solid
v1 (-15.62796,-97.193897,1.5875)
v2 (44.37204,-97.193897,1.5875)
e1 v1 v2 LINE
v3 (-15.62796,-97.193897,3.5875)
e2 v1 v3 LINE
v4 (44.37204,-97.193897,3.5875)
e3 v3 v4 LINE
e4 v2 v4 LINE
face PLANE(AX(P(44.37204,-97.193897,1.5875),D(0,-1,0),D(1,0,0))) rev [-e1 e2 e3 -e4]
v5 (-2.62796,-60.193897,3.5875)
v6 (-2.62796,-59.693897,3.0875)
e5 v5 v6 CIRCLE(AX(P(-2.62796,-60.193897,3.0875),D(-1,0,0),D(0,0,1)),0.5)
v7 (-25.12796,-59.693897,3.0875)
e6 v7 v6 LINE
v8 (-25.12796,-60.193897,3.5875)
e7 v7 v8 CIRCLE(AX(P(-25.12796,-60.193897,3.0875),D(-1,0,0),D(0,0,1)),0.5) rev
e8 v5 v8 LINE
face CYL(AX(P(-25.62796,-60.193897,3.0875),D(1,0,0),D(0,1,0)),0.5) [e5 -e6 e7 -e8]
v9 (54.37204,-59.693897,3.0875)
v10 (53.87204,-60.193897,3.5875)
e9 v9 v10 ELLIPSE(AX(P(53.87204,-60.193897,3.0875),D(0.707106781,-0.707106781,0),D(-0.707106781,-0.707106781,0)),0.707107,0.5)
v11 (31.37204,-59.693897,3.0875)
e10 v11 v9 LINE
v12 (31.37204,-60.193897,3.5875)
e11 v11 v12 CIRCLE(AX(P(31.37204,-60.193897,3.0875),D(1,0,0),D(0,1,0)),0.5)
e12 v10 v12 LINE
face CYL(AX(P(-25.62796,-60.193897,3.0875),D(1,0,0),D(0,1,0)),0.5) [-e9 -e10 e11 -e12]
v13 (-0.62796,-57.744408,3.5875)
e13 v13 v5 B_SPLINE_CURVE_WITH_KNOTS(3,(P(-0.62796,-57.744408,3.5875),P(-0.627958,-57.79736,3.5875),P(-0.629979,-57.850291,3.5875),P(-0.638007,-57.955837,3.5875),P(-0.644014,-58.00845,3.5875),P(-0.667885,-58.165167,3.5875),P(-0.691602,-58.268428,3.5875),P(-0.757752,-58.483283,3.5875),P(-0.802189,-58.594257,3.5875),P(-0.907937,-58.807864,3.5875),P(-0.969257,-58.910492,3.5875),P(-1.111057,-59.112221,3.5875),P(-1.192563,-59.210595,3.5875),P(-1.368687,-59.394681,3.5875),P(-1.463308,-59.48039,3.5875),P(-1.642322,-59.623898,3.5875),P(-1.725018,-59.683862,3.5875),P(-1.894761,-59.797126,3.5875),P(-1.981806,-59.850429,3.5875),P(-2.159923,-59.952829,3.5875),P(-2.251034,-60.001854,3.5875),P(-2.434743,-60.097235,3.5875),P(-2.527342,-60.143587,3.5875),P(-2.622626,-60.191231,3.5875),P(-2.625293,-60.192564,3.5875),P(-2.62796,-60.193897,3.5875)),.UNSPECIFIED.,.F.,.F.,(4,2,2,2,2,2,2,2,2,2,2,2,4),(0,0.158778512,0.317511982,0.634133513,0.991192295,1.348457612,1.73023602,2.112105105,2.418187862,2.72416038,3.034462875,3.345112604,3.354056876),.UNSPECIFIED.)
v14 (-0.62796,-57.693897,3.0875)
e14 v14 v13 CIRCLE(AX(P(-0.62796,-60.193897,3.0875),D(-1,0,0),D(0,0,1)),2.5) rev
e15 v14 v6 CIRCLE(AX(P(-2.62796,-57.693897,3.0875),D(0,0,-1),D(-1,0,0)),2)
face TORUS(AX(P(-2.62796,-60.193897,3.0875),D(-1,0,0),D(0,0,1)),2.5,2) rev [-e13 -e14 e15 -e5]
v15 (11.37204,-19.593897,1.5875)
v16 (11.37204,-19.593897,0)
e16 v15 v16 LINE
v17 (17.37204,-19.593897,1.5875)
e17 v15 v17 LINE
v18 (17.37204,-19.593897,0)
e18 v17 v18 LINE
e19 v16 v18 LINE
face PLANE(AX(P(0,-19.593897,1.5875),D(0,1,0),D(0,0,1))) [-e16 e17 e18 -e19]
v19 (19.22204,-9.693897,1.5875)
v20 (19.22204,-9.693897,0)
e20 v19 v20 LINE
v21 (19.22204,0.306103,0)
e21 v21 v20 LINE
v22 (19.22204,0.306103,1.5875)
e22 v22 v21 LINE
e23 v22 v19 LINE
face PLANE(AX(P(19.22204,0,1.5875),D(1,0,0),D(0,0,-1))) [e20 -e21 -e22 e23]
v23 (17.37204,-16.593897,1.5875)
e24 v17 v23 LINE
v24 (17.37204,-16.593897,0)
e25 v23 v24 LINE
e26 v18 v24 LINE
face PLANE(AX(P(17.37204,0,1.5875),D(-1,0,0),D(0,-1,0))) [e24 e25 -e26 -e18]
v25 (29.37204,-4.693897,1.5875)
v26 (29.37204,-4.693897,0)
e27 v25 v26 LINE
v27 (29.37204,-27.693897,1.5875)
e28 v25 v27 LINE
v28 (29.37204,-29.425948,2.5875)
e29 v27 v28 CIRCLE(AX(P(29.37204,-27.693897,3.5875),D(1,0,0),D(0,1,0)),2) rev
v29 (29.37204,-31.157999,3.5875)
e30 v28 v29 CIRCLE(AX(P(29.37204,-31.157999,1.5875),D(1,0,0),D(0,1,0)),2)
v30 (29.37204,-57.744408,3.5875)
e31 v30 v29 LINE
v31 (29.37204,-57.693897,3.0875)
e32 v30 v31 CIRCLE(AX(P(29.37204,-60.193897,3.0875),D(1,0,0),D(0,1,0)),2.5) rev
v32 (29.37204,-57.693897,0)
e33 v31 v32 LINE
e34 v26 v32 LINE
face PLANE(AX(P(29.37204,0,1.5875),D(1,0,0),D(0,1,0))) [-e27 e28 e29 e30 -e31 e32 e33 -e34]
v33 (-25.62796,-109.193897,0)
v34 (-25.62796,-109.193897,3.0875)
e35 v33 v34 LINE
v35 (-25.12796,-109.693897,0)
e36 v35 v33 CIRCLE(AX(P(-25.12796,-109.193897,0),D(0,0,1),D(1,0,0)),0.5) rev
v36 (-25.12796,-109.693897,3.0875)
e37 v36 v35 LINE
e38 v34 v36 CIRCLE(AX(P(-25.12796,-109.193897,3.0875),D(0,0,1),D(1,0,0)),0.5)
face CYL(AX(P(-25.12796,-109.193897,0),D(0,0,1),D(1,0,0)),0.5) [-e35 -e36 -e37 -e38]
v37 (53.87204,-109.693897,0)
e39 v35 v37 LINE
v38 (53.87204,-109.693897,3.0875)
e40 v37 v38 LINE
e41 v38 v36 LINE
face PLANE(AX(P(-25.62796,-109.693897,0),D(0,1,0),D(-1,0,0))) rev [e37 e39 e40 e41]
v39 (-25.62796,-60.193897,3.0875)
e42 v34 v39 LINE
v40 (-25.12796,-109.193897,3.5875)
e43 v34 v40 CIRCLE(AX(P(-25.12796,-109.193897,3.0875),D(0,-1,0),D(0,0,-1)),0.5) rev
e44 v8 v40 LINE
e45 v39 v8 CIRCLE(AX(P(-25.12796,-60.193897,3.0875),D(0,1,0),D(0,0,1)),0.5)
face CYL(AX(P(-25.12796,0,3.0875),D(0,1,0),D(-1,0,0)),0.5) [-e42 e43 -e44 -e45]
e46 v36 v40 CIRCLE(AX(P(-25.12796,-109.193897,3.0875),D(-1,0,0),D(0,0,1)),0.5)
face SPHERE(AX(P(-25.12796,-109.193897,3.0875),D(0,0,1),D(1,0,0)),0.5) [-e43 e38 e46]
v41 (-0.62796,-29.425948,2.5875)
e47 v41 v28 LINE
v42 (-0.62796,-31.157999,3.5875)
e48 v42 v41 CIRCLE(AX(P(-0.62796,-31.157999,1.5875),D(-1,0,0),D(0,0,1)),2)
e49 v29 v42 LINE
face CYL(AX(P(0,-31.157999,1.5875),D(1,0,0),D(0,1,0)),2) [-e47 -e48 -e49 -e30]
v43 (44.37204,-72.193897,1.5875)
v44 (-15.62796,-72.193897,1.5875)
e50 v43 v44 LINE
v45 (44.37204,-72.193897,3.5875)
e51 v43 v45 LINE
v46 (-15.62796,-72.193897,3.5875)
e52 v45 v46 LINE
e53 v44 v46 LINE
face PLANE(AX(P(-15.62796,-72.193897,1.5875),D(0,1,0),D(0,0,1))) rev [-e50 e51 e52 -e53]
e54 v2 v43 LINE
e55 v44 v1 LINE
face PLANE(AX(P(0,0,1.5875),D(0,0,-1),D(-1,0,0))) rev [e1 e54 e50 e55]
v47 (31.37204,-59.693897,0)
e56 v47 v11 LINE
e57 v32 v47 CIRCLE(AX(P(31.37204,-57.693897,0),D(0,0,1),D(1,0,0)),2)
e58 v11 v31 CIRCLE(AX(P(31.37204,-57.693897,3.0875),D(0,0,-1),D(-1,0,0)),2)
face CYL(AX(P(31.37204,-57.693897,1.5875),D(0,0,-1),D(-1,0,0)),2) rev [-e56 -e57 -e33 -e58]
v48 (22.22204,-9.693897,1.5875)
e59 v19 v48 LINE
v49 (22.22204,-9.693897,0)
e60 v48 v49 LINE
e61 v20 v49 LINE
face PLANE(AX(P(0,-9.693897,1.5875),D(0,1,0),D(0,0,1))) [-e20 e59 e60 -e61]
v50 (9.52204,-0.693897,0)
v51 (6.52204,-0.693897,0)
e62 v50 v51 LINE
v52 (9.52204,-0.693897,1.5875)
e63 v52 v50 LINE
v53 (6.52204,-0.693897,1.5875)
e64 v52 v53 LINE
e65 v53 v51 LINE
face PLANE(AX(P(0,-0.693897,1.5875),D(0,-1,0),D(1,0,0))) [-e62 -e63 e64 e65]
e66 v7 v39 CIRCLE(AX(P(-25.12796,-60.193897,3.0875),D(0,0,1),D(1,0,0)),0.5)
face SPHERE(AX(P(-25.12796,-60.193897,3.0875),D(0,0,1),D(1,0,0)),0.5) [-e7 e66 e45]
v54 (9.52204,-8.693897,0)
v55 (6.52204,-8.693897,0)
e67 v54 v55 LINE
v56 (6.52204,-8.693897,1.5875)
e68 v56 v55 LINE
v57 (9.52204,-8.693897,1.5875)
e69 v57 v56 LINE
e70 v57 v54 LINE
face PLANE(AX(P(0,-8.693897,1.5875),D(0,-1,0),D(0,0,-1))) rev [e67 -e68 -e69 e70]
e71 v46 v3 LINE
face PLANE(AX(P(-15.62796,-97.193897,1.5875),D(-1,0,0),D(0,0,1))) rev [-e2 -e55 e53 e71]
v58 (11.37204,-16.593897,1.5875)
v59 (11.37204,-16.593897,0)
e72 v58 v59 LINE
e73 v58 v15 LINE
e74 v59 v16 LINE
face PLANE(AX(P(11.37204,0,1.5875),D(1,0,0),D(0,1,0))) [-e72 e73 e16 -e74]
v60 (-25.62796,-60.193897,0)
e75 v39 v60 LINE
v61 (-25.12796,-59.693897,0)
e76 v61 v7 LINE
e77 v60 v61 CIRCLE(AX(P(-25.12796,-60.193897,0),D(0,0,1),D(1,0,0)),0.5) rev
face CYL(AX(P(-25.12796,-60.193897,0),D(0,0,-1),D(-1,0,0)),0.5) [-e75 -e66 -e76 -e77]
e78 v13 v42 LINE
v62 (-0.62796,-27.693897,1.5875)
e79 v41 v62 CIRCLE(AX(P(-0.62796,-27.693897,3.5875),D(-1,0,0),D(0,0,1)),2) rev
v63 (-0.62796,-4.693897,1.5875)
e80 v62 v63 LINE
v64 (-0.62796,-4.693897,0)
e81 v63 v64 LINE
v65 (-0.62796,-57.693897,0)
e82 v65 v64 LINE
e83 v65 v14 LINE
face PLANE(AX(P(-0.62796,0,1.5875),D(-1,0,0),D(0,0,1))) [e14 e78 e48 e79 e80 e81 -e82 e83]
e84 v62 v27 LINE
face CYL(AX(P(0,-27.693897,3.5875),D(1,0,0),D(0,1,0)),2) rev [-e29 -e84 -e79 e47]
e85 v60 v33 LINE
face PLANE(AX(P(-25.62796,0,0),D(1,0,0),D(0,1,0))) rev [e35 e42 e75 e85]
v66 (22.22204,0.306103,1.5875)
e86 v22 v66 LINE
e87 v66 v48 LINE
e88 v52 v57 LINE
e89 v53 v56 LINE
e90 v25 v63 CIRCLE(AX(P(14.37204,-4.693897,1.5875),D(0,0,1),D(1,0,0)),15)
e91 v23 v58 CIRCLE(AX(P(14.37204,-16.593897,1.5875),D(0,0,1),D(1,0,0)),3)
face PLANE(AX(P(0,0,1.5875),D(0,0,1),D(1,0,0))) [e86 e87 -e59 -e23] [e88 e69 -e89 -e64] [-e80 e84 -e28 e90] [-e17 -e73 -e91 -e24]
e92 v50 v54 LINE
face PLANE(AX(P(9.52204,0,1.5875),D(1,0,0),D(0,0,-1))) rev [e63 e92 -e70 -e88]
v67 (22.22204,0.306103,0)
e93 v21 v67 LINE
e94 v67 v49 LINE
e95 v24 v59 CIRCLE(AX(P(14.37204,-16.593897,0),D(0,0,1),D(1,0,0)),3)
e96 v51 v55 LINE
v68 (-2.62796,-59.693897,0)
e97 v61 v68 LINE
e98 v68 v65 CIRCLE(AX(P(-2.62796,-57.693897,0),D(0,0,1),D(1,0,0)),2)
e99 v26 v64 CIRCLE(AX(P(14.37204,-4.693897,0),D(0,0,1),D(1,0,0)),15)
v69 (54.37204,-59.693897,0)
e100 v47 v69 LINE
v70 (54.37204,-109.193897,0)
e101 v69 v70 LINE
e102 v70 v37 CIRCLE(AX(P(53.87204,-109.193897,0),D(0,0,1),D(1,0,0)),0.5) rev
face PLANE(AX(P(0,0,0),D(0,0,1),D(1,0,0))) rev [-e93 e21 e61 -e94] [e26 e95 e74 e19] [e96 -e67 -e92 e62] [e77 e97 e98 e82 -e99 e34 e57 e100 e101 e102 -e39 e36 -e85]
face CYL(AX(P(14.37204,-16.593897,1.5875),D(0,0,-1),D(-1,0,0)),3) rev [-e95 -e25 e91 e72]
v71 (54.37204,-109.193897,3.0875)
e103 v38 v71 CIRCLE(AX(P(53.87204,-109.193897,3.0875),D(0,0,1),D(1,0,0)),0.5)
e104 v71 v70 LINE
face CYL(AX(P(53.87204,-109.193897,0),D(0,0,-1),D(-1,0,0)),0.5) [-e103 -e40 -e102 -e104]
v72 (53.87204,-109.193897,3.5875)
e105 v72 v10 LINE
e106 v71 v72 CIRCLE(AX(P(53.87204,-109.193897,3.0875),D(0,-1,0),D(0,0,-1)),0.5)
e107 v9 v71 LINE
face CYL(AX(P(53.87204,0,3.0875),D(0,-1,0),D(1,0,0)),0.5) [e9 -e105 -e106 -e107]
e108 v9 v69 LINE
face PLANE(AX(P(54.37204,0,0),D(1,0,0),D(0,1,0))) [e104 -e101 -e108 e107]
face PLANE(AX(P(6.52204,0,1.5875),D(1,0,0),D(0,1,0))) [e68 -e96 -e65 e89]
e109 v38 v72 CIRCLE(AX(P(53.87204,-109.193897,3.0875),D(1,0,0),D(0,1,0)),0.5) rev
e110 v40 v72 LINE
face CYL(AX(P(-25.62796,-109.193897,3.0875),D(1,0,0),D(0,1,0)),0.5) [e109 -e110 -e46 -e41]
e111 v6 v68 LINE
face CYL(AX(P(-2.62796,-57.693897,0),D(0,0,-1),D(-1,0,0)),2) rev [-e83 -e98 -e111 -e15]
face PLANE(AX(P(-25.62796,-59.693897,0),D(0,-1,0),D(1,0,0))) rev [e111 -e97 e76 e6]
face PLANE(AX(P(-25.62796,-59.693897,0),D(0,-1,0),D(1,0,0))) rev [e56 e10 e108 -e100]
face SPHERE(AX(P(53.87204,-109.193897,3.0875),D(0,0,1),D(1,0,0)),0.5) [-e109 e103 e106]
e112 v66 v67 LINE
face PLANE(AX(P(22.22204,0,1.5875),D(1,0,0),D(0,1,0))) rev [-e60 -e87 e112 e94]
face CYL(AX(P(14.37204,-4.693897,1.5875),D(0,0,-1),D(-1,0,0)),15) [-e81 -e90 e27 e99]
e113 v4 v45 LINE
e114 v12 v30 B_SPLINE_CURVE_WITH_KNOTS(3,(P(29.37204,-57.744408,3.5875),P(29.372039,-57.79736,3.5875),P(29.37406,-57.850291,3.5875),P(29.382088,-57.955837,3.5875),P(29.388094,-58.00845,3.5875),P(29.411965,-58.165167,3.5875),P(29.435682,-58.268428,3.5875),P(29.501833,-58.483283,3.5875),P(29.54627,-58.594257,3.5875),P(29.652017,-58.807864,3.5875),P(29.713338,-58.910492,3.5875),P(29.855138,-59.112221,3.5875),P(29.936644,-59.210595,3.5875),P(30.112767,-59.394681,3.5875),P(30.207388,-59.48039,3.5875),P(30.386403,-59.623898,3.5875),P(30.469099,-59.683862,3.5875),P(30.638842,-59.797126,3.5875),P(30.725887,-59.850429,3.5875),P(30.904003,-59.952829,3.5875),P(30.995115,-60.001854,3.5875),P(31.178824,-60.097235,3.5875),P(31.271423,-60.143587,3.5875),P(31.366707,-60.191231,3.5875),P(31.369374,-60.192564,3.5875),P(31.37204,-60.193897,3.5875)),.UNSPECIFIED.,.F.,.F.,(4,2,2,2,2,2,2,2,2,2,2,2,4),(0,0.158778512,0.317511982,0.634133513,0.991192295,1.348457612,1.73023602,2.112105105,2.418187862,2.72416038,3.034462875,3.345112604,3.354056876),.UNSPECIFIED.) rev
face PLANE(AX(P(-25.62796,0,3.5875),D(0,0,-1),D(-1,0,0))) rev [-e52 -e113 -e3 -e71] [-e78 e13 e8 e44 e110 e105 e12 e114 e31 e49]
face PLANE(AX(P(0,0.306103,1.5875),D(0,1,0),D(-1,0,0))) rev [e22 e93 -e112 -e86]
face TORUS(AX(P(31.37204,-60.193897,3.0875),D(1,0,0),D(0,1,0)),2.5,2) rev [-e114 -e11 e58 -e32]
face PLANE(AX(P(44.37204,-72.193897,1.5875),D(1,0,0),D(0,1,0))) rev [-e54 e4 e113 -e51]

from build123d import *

# Parameters (mm, degrees)
SKETCH1_W                = 3
SKETCH1_H                = 10
SKETCH1_H_2              = 8
BOSS_EXTRUDE1_DEPTH      = 1.5875
BOSS_EXTRUDE2_DEPTH      = 40
BOSS_EXTRUDE2_DEPTH_BACK = 40
SKETCH3_W                = 2
SKETCH3_H                = 50
SKETCH3_W_2              = 1.5875
SKETCH6_W                = 2
SKETCH6_H                = 30
BOSS_EXTRUDE3_DEPTH      = 30
SKETCH4_W                = 60
SKETCH4_H                = 25
CUT_EXTRUDE1_DEPTH       = 2
FILLET3_R                = 0.5
FILLET5_R                = 2
FILLET6_R                = 2


with BuildPart() as part:
    # Sketch1 → Boss-Extrude1 (new body)
    with BuildSketch(Plane.XY):
        with BuildLine():
            Line((29.372040361, -4.693897293), (29.372040361, -59.693897293))
            Line((29.372040361, -59.693897293), (-0.627959639, -59.693897293))
            Line((-0.627959639, -59.693897293), (-0.627959639, -4.693897293))
            ThreePointArc((-0.627959639, -4.693897293), (14.372040361, 10.306102707), (29.372040361, -4.693897293))
        make_face()
        with Locations((20.722040361, -4.693897293)):
            Rectangle(SKETCH1_W, SKETCH1_H, mode=Mode.SUBTRACT)
        with Locations((8.022040361, -4.693897293)):
            Rectangle(SKETCH1_W, SKETCH1_H_2, mode=Mode.SUBTRACT)
        with BuildLine():
            ThreePointArc((17.372040361, -16.593897293), (14.372040361, -13.593897293), (11.372040361, -16.593897293))
            Line((11.372040361, -16.593897293), (11.372040361, -19.593897293))
            Line((11.372040361, -19.593897293), (17.372040361, -19.593897293))
            Line((17.372040361, -19.593897293), (17.372040361, -16.593897293))
        make_face(mode=Mode.SUBTRACT)
    extrude(amount=BOSS_EXTRUDE1_DEPTH)

    # Sketch3 → Boss-Extrude2 (add, two sides: drawn at the far end of the back side and taken through both)
    with BuildSketch(Plane(origin=(14.372040361, 0, 0), x_dir=(0, 0, -1), z_dir=(1, 0, 0)).offset(-BOSS_EXTRUDE2_DEPTH_BACK)):
        with Locations((-2.5875, -84.693897293)):
            Rectangle(SKETCH3_W, SKETCH3_H)
        with Locations((-0.79375, -84.693897293)):
            Rectangle(SKETCH3_W_2, SKETCH3_H)
    extrude(amount=BOSS_EXTRUDE2_DEPTH + BOSS_EXTRUDE2_DEPTH_BACK)

    # Sketch6 → Boss-Extrude3 (add)
    with BuildSketch(Plane(origin=(29.372040361, 0, 0), x_dir=(0, 0, -1), z_dir=(1, 0, 0))):
        with Locations((-2.5875, -44.693897293)):
            Rectangle(SKETCH6_W, SKETCH6_H)
    extrude(amount=-BOSS_EXTRUDE3_DEPTH)

    # Sketch4 → Cut-Extrude1 (cut)
    with BuildSketch(Plane.XY.offset(3.5875)):
        with Locations((14.372040361, -84.693897293)):
            Rectangle(SKETCH4_W, SKETCH4_H)
    extrude(amount=-CUT_EXTRUDE1_DEPTH, mode=Mode.SUBTRACT)

    # Fillet3
    fillet3_edges = [part.edges().sort_by_distance(p)[0] for p in [
        (-13.127959639, -59.693897293, 3.5875),
        (54.372040361, -109.693897293, 1.79375),
        (14.372040361, -109.693897293, 3.5875),
        (54.372040361, -84.693897293, 3.5875),
        (-25.627959639, -59.693897293, 1.79375),
        (-25.627959639, -109.693897293, 1.79375),
        (-25.627959639, -84.693897293, 3.5875),
        (41.872040361, -59.693897293, 3.5875),
    ]]
    fillet(fillet3_edges, radius=FILLET3_R)

    # Fillet5
    # the kernel refuses this fillet: 2 mm, written as the material it adds along each edge
    with BuildSketch(Plane(origin=(-0.627959639, -60.193897293, 3.0875), x_dir=(0, 1, 0), z_dir=(0, 0, -1))) as fillet5_piece_1_section:
        with BuildLine():
            CenterArc((0.5 + FILLET5_R, -FILLET5_R), FILLET5_R, 90, 90)
            Line((0.5 + FILLET5_R, 0), (0.5, 0))
            Line((0.5, 0), (0.5, -FILLET5_R))
        make_face()
    fillet5_piece_1 = revolve(axis=Axis((-0.627959639, -60.193897293, 3.0875), (1, 0, 0)), revolution_arc=359.64, mode=Mode.PRIVATE)
    fillet5_piece_1 = split(fillet5_piece_1, bisect_by=Plane(origin=(-1.414331511, -59.810829733, 3.5875), z_dir=(0, 0, -1)), keep=Keep.TOP, mode=Mode.PRIVATE)
    add(fillet5_piece_1)
    with BuildSketch(Plane(origin=(29.372040361, -60.193897293, 3.0875), x_dir=(0, 0.9999802608561372, -0.006283143965558423), z_dir=(0, 0.006283143965558423, 0.9999802608561372))) as fillet5_piece_2_section:
        with BuildLine():
            CenterArc((-0.5 - FILLET5_R, -FILLET5_R), FILLET5_R, 0, 90)
            Line((-0.5, -FILLET5_R), (-0.5, 0))
            Line((-0.5, 0), (-0.5 - FILLET5_R, 0))
        make_face()
    fillet5_piece_2 = revolve(axis=Axis((29.372040361, -60.193897293, 3.0875), (-1, 0, 0)), revolution_arc=359.64, mode=Mode.PRIVATE)
    fillet5_piece_2 = split(fillet5_piece_2, bisect_by=Plane(origin=(30.158412419, -59.810829718, 3.5875), z_dir=(0, 0, -1)), keep=Keep.TOP, mode=Mode.PRIVATE)
    add(fillet5_piece_2)
    with BuildSketch(Plane(origin=(29.372040361, -29.693897293, 1.5875), x_dir=(0, 0, 1), z_dir=(-1, 0, 0))) as fillet5_piece_3:
        with BuildLine():
            CenterArc((FILLET5_R, FILLET5_R), FILLET5_R, 180, 90)
            Line((0, FILLET5_R), (0, 0))
            Line((0, 0), (FILLET5_R, 0))
        make_face()
    extrude(amount=30)
    with BuildSketch(Plane(origin=(-0.627959639, -59.693897293, 3.0875), x_dir=(-1, 0, 0), z_dir=(0, 0, -1))) as fillet5_piece_4:
        with BuildLine():
            CenterArc((FILLET5_R, FILLET5_R), FILLET5_R, 180, 90)
            Line((0, FILLET5_R), (0, 0))
            Line((0, 0), (FILLET5_R, 0))
        make_face()
    extrude(amount=3.0875)
    with BuildSketch(Plane(origin=(29.372040361, -59.693897293, 0), x_dir=(0, 1, 0), z_dir=(0, 0, 1))) as fillet5_piece_5:
        with BuildLine():
            CenterArc((FILLET5_R, -FILLET5_R), FILLET5_R, 90, 90)
            Line((0, -FILLET5_R), (0, 0))
            Line((0, 0), (FILLET5_R, 0))
        make_face()
    extrude(amount=3.0875)

    # Fillet6
    fillet6_edges = [part.edges().sort_by_distance(p)[0] for p in [
        (14.372040361, -29.693897293, 3.5875),
    ]]
    fillet(fillet6_edges, radius=FILLET6_R)


solid = part.part
